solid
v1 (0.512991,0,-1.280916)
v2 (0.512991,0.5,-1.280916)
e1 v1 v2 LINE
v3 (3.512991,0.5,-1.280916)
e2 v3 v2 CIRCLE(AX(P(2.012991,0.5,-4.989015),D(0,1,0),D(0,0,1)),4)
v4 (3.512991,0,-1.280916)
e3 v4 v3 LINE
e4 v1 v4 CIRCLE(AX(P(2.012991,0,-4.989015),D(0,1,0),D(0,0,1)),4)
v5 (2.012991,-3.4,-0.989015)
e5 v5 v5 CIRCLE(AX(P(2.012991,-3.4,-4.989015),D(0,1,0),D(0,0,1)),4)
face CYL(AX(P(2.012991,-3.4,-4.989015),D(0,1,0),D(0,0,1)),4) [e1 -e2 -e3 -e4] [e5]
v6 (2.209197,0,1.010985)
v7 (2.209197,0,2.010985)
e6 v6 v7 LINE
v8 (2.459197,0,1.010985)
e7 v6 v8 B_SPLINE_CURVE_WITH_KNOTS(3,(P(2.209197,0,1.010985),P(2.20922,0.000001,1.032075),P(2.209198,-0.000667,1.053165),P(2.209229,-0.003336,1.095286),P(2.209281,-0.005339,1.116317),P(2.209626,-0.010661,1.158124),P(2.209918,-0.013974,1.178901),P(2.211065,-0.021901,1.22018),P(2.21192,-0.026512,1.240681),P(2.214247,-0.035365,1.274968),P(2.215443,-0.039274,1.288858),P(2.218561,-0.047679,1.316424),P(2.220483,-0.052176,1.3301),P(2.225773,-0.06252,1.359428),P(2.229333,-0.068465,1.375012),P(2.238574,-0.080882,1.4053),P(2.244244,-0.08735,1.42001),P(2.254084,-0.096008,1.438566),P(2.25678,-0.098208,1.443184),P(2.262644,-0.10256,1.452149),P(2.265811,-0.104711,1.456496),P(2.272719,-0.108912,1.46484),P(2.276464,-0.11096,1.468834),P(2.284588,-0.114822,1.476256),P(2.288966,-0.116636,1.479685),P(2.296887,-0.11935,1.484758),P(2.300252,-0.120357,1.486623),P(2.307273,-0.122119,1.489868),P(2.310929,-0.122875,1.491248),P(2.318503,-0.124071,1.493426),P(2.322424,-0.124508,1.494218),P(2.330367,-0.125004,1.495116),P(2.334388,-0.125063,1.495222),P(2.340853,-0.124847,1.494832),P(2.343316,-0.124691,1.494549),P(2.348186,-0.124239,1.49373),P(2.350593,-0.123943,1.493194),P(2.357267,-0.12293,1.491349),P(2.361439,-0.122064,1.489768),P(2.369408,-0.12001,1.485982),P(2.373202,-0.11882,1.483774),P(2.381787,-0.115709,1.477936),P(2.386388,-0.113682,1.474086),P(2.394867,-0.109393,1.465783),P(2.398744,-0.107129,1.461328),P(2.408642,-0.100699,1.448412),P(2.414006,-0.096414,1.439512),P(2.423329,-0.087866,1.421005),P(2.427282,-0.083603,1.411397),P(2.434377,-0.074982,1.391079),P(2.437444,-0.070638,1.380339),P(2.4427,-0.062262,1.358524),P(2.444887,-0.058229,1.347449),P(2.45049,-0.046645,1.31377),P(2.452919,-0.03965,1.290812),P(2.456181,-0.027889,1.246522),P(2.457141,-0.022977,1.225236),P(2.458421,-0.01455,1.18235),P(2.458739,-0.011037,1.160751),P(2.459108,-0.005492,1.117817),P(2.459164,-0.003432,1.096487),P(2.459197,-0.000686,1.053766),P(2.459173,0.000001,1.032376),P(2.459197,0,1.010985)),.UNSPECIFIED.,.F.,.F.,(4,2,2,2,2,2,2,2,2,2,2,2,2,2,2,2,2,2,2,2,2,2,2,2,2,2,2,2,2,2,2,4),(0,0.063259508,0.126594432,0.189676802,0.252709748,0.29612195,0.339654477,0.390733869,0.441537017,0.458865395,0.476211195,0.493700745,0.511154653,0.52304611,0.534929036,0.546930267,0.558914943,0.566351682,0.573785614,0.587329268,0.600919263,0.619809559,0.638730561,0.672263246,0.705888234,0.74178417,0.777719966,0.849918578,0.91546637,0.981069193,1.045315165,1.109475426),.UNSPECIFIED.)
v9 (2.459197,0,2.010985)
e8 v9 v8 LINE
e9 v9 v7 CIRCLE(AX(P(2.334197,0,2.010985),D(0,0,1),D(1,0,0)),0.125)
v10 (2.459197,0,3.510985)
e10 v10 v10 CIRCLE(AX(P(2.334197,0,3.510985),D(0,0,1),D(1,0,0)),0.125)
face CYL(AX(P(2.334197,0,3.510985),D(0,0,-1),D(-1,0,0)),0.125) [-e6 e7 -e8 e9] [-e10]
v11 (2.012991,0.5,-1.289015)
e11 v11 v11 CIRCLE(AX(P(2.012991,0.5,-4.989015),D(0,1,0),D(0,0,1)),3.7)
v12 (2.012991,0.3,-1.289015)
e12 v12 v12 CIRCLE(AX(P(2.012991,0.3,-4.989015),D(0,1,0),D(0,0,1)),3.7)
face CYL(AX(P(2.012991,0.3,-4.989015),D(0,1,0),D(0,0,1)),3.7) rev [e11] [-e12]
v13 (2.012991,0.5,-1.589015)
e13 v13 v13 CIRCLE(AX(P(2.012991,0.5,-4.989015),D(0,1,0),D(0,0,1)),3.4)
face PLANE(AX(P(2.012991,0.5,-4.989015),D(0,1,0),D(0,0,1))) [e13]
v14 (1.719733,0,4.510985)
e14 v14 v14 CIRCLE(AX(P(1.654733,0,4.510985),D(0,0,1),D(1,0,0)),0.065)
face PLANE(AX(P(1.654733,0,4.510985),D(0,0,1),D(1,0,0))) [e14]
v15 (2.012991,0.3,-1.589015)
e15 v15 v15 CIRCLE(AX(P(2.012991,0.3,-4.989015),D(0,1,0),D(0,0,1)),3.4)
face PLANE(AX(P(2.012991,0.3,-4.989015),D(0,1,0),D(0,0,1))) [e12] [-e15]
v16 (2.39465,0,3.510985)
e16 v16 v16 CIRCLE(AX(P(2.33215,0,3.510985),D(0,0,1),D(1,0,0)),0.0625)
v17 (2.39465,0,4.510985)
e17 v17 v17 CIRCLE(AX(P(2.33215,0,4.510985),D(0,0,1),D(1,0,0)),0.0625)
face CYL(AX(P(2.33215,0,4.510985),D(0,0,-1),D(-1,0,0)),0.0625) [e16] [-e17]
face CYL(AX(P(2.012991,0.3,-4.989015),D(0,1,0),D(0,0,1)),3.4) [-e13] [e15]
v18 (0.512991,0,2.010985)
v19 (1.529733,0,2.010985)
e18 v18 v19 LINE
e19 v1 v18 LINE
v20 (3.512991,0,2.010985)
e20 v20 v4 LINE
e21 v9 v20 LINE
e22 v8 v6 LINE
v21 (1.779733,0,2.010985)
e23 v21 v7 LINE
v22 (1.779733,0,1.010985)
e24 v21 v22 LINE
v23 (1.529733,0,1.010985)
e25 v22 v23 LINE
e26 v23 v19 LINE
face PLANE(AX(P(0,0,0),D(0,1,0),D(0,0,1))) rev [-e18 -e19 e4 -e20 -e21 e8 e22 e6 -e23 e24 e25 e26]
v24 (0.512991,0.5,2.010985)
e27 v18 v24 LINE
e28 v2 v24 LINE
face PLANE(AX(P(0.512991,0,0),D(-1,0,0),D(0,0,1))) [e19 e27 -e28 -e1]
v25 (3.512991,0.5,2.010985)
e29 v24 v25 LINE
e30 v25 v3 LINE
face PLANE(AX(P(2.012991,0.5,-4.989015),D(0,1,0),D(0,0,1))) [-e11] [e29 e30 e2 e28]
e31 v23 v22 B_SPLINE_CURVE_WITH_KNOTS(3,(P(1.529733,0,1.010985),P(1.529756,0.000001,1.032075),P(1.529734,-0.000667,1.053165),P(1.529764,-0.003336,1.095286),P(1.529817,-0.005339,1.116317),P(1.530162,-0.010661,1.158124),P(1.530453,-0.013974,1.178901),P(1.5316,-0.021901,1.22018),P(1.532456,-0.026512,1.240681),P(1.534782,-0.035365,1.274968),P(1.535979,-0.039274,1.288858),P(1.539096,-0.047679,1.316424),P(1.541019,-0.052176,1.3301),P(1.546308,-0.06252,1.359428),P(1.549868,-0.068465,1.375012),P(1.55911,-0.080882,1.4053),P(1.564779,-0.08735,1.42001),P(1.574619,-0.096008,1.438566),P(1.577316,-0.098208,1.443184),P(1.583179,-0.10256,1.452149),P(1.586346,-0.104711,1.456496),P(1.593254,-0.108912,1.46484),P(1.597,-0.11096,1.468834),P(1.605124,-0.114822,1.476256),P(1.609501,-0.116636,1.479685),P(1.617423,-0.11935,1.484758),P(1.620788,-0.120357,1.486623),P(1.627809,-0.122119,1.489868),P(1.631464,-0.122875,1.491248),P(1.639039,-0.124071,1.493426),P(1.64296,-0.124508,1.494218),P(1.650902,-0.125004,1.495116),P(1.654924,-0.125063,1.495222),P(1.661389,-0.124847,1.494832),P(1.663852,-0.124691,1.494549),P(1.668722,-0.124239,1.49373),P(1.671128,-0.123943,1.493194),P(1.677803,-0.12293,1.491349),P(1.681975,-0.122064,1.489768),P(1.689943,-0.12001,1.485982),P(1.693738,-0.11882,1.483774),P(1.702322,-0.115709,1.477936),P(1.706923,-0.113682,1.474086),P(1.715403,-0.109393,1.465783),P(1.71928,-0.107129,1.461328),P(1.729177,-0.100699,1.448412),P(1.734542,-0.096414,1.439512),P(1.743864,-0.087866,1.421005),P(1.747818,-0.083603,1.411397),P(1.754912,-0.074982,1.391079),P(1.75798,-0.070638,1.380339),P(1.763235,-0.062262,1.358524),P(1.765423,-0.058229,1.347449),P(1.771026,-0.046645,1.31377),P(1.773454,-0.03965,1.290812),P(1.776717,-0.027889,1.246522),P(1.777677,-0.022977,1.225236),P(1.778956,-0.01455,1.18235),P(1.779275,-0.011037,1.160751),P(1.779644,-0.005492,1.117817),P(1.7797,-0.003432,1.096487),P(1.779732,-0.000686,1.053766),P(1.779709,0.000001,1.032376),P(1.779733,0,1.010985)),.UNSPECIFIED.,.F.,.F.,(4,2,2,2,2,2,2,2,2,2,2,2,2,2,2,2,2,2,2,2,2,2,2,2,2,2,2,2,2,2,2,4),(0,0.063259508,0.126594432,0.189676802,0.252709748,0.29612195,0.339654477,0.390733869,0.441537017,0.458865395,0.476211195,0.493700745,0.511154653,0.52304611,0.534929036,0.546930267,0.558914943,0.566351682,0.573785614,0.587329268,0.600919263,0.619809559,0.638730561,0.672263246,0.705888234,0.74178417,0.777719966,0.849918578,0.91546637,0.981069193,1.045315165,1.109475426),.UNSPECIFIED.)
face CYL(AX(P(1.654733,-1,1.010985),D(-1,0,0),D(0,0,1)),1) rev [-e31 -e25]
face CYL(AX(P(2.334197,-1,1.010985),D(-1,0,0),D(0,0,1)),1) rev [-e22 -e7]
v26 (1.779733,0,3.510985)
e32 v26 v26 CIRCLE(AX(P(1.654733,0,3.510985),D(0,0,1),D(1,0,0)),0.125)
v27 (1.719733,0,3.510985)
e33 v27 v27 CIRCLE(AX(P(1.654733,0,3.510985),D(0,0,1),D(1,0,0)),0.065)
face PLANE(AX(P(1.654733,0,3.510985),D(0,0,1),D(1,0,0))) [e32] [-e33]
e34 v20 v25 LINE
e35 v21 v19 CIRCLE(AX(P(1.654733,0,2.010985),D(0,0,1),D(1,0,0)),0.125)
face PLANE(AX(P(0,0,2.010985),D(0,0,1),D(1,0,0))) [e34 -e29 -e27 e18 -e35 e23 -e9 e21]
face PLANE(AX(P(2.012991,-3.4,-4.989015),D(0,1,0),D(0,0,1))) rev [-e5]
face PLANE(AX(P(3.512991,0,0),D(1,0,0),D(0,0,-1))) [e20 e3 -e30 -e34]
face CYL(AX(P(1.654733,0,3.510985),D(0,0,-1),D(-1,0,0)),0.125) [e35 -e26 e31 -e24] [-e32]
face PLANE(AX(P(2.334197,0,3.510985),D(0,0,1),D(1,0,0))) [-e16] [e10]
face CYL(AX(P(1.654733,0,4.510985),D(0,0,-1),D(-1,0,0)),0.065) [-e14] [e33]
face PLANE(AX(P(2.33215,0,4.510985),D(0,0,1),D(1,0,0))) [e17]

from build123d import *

# Parameters (mm, degrees)
SKETCH1_R               = 4
BOSS_EXTRUDE3_DEPTH     = 3.4
BOSS_EXTRUDE5_START     = 0.5
SKETCH3_R               = 4
BOSS_EXTRUDE5_DEPTH     = 0.5
BOSS_EXTRUDE6_DEPTH     = 0.5
SKETCH8_R               = 0.125
BOSS_EXTRUDE10_DEPTH    = 1.5
SKETCH9_R               = 0.0625
SKETCH9_R_2             = 0.065
BOSS_EXTRUDE11_DEPTH    = 1
CONG_1_R                = 1
ESQUISSE1_R             = 3.7
ESQUISSE1_R_2           = 3.4
ENL_V_MAT_EXTRU_1_DEPTH = 0.2


with BuildPart() as part:
    # Sketch1 → Boss-Extrude3 (new body)
    with BuildSketch(Plane(origin=(0, 0, 0), x_dir=(1, 0, 0), z_dir=(0, 1, 0))):
        with Locations(Location((2.012990556, 4.989015145, 0), (0, 0, 270))):
            Circle(SKETCH1_R)
    extrude(amount=-BOSS_EXTRUDE3_DEPTH)

    # Sketch3 → Boss-Extrude5 (add)
    with BuildSketch(Plane(origin=(0, 0, 0), x_dir=(1, 0, 0), z_dir=(0, 1, 0)).offset(BOSS_EXTRUDE5_START)):
        with Locations(Location((2.012990556, 4.989015145, 0), (0, 0, 270))):
            Circle(SKETCH3_R)
    extrude(amount=-BOSS_EXTRUDE5_DEPTH)

    # Sketch5 → Boss-Extrude6 (add)
    with BuildSketch(Plane(origin=(0, 0.5, 0), x_dir=(1, 0, 0), z_dir=(0, 1, 0))):
        with BuildLine():
            ThreePointArc((3.512990556, 1.280915901), (2.012990556, 0.989015145), (0.512990556, 1.280915901))
            Line((0.512990556, 1.280915901), (0.512990556, -2.010984855))
            Line((0.512990556, -2.010984855), (3.512990556, -2.010984855))
            Line((3.512990556, -2.010984855), (3.512990556, 1.280915901))
        make_face()
    extrude(amount=-BOSS_EXTRUDE6_DEPTH)

    # Sketch8 → Boss-Extrude10 (add)
    with BuildSketch(Plane.XY.offset(2.010984855)):
        with Locations((2.334197454, 0)):
            Circle(SKETCH8_R)
        with Locations((1.65473302, 0)):
            Circle(SKETCH8_R)
    extrude(amount=BOSS_EXTRUDE10_DEPTH)

    # Sketch9 → Boss-Extrude11 (add)
    with BuildSketch(Plane.XY.offset(3.510984855)):
        with Locations((2.332150334, 0)):
            Circle(SKETCH9_R)
        with Locations((1.65473302, 0)):
            Circle(SKETCH9_R_2)
    extrude(amount=BOSS_EXTRUDE11_DEPTH)

    # Congé1
    # the kernel refuses this fillet: 1 mm, written as the material it adds along each edge
    with BuildSketch(Plane(origin=(-0.290802546, 0, 2.010984855), x_dir=(0, 0, -1), z_dir=(1, 0, 0))) as cong_1_piece_1_section:
        with BuildLine():
            CenterArc((CONG_1_R, -CONG_1_R), CONG_1_R, 90, 90)
            Line((0, -CONG_1_R), (0, 0))
            Line((0, 0), (CONG_1_R, 0))
        make_face()
    cong_1_piece_1 = extrude(amount=5.25, mode=Mode.PRIVATE)
    cong_1_piece_1 = cong_1_piece_1 & Plane(origin=(2.334197454, 0, 1.652352457), x_dir=(1, 0, 0), z_dir=(0, 0, -1)) * Cylinder(0.125, 15, mode=Mode.PRIVATE)
    add(cong_1_piece_1)
    with BuildSketch(Plane(origin=(-0.290802546, 0, 2.010984855), x_dir=(0, 0, -1), z_dir=(1, 0, 0))) as cong_1_piece_2_section:
        with BuildLine():
            CenterArc((CONG_1_R, -CONG_1_R), CONG_1_R, 90, 90)
            Line((0, -CONG_1_R), (0, 0))
            Line((0, 0), (CONG_1_R, 0))
        make_face()
    cong_1_piece_2 = extrude(amount=5.25, mode=Mode.PRIVATE)
    cong_1_piece_2 = cong_1_piece_2 & Plane(origin=(1.65473302, 0, 1.652352457), x_dir=(1, 0, 0), z_dir=(0, 0, -1)) * Cylinder(0.125, 15, mode=Mode.PRIVATE)
    add(cong_1_piece_2)
    with BuildSketch(Plane(origin=(-0.97026698, 0, 2.010984855), x_dir=(0, 0, -1), z_dir=(1, 0, 0))) as cong_1_piece_3_section:
        with BuildLine():
            CenterArc((CONG_1_R, -CONG_1_R), CONG_1_R, 90, 90)
            Line((0, -CONG_1_R), (0, 0))
            Line((0, 0), (CONG_1_R, 0))
        make_face()
    cong_1_piece_3 = extrude(amount=5.25, mode=Mode.PRIVATE)
    cong_1_piece_3 = cong_1_piece_3 & Plane(origin=(2.334197454, 0, 1.652352457), x_dir=(1, 0, 0), z_dir=(0, 0, -1)) * Cylinder(0.125, 15, mode=Mode.PRIVATE)
    add(cong_1_piece_3)
    with BuildSketch(Plane(origin=(-0.97026698, 0, 2.010984855), x_dir=(0, 0, -1), z_dir=(1, 0, 0))) as cong_1_piece_4_section:
        with BuildLine():
            CenterArc((CONG_1_R, -CONG_1_R), CONG_1_R, 90, 90)
            Line((0, -CONG_1_R), (0, 0))
            Line((0, 0), (CONG_1_R, 0))
        make_face()
    cong_1_piece_4 = extrude(amount=5.25, mode=Mode.PRIVATE)
    cong_1_piece_4 = cong_1_piece_4 & Plane(origin=(1.65473302, 0, 1.652352457), x_dir=(1, 0, 0), z_dir=(0, 0, -1)) * Cylinder(0.125, 15, mode=Mode.PRIVATE)
    add(cong_1_piece_4)

    # Esquisse1 → Enlèv. mat.-Extru.1 (cut)
    with BuildSketch(Plane(origin=(0, 0.5, 0), x_dir=(1, 0, 0), z_dir=(0, 1, 0))):
        with Locations(Location((2.012990556, 4.989015145, 0), (0, 0, 270))):
            Circle(ESQUISSE1_R)
        with Locations(Location((2.012990556, 4.989015145, 0), (0, 0, 270))):
            Circle(ESQUISSE1_R_2, mode=Mode.SUBTRACT)
    extrude(amount=-ENL_V_MAT_EXTRU_1_DEPTH, mode=Mode.SUBTRACT)


solid = part.part
